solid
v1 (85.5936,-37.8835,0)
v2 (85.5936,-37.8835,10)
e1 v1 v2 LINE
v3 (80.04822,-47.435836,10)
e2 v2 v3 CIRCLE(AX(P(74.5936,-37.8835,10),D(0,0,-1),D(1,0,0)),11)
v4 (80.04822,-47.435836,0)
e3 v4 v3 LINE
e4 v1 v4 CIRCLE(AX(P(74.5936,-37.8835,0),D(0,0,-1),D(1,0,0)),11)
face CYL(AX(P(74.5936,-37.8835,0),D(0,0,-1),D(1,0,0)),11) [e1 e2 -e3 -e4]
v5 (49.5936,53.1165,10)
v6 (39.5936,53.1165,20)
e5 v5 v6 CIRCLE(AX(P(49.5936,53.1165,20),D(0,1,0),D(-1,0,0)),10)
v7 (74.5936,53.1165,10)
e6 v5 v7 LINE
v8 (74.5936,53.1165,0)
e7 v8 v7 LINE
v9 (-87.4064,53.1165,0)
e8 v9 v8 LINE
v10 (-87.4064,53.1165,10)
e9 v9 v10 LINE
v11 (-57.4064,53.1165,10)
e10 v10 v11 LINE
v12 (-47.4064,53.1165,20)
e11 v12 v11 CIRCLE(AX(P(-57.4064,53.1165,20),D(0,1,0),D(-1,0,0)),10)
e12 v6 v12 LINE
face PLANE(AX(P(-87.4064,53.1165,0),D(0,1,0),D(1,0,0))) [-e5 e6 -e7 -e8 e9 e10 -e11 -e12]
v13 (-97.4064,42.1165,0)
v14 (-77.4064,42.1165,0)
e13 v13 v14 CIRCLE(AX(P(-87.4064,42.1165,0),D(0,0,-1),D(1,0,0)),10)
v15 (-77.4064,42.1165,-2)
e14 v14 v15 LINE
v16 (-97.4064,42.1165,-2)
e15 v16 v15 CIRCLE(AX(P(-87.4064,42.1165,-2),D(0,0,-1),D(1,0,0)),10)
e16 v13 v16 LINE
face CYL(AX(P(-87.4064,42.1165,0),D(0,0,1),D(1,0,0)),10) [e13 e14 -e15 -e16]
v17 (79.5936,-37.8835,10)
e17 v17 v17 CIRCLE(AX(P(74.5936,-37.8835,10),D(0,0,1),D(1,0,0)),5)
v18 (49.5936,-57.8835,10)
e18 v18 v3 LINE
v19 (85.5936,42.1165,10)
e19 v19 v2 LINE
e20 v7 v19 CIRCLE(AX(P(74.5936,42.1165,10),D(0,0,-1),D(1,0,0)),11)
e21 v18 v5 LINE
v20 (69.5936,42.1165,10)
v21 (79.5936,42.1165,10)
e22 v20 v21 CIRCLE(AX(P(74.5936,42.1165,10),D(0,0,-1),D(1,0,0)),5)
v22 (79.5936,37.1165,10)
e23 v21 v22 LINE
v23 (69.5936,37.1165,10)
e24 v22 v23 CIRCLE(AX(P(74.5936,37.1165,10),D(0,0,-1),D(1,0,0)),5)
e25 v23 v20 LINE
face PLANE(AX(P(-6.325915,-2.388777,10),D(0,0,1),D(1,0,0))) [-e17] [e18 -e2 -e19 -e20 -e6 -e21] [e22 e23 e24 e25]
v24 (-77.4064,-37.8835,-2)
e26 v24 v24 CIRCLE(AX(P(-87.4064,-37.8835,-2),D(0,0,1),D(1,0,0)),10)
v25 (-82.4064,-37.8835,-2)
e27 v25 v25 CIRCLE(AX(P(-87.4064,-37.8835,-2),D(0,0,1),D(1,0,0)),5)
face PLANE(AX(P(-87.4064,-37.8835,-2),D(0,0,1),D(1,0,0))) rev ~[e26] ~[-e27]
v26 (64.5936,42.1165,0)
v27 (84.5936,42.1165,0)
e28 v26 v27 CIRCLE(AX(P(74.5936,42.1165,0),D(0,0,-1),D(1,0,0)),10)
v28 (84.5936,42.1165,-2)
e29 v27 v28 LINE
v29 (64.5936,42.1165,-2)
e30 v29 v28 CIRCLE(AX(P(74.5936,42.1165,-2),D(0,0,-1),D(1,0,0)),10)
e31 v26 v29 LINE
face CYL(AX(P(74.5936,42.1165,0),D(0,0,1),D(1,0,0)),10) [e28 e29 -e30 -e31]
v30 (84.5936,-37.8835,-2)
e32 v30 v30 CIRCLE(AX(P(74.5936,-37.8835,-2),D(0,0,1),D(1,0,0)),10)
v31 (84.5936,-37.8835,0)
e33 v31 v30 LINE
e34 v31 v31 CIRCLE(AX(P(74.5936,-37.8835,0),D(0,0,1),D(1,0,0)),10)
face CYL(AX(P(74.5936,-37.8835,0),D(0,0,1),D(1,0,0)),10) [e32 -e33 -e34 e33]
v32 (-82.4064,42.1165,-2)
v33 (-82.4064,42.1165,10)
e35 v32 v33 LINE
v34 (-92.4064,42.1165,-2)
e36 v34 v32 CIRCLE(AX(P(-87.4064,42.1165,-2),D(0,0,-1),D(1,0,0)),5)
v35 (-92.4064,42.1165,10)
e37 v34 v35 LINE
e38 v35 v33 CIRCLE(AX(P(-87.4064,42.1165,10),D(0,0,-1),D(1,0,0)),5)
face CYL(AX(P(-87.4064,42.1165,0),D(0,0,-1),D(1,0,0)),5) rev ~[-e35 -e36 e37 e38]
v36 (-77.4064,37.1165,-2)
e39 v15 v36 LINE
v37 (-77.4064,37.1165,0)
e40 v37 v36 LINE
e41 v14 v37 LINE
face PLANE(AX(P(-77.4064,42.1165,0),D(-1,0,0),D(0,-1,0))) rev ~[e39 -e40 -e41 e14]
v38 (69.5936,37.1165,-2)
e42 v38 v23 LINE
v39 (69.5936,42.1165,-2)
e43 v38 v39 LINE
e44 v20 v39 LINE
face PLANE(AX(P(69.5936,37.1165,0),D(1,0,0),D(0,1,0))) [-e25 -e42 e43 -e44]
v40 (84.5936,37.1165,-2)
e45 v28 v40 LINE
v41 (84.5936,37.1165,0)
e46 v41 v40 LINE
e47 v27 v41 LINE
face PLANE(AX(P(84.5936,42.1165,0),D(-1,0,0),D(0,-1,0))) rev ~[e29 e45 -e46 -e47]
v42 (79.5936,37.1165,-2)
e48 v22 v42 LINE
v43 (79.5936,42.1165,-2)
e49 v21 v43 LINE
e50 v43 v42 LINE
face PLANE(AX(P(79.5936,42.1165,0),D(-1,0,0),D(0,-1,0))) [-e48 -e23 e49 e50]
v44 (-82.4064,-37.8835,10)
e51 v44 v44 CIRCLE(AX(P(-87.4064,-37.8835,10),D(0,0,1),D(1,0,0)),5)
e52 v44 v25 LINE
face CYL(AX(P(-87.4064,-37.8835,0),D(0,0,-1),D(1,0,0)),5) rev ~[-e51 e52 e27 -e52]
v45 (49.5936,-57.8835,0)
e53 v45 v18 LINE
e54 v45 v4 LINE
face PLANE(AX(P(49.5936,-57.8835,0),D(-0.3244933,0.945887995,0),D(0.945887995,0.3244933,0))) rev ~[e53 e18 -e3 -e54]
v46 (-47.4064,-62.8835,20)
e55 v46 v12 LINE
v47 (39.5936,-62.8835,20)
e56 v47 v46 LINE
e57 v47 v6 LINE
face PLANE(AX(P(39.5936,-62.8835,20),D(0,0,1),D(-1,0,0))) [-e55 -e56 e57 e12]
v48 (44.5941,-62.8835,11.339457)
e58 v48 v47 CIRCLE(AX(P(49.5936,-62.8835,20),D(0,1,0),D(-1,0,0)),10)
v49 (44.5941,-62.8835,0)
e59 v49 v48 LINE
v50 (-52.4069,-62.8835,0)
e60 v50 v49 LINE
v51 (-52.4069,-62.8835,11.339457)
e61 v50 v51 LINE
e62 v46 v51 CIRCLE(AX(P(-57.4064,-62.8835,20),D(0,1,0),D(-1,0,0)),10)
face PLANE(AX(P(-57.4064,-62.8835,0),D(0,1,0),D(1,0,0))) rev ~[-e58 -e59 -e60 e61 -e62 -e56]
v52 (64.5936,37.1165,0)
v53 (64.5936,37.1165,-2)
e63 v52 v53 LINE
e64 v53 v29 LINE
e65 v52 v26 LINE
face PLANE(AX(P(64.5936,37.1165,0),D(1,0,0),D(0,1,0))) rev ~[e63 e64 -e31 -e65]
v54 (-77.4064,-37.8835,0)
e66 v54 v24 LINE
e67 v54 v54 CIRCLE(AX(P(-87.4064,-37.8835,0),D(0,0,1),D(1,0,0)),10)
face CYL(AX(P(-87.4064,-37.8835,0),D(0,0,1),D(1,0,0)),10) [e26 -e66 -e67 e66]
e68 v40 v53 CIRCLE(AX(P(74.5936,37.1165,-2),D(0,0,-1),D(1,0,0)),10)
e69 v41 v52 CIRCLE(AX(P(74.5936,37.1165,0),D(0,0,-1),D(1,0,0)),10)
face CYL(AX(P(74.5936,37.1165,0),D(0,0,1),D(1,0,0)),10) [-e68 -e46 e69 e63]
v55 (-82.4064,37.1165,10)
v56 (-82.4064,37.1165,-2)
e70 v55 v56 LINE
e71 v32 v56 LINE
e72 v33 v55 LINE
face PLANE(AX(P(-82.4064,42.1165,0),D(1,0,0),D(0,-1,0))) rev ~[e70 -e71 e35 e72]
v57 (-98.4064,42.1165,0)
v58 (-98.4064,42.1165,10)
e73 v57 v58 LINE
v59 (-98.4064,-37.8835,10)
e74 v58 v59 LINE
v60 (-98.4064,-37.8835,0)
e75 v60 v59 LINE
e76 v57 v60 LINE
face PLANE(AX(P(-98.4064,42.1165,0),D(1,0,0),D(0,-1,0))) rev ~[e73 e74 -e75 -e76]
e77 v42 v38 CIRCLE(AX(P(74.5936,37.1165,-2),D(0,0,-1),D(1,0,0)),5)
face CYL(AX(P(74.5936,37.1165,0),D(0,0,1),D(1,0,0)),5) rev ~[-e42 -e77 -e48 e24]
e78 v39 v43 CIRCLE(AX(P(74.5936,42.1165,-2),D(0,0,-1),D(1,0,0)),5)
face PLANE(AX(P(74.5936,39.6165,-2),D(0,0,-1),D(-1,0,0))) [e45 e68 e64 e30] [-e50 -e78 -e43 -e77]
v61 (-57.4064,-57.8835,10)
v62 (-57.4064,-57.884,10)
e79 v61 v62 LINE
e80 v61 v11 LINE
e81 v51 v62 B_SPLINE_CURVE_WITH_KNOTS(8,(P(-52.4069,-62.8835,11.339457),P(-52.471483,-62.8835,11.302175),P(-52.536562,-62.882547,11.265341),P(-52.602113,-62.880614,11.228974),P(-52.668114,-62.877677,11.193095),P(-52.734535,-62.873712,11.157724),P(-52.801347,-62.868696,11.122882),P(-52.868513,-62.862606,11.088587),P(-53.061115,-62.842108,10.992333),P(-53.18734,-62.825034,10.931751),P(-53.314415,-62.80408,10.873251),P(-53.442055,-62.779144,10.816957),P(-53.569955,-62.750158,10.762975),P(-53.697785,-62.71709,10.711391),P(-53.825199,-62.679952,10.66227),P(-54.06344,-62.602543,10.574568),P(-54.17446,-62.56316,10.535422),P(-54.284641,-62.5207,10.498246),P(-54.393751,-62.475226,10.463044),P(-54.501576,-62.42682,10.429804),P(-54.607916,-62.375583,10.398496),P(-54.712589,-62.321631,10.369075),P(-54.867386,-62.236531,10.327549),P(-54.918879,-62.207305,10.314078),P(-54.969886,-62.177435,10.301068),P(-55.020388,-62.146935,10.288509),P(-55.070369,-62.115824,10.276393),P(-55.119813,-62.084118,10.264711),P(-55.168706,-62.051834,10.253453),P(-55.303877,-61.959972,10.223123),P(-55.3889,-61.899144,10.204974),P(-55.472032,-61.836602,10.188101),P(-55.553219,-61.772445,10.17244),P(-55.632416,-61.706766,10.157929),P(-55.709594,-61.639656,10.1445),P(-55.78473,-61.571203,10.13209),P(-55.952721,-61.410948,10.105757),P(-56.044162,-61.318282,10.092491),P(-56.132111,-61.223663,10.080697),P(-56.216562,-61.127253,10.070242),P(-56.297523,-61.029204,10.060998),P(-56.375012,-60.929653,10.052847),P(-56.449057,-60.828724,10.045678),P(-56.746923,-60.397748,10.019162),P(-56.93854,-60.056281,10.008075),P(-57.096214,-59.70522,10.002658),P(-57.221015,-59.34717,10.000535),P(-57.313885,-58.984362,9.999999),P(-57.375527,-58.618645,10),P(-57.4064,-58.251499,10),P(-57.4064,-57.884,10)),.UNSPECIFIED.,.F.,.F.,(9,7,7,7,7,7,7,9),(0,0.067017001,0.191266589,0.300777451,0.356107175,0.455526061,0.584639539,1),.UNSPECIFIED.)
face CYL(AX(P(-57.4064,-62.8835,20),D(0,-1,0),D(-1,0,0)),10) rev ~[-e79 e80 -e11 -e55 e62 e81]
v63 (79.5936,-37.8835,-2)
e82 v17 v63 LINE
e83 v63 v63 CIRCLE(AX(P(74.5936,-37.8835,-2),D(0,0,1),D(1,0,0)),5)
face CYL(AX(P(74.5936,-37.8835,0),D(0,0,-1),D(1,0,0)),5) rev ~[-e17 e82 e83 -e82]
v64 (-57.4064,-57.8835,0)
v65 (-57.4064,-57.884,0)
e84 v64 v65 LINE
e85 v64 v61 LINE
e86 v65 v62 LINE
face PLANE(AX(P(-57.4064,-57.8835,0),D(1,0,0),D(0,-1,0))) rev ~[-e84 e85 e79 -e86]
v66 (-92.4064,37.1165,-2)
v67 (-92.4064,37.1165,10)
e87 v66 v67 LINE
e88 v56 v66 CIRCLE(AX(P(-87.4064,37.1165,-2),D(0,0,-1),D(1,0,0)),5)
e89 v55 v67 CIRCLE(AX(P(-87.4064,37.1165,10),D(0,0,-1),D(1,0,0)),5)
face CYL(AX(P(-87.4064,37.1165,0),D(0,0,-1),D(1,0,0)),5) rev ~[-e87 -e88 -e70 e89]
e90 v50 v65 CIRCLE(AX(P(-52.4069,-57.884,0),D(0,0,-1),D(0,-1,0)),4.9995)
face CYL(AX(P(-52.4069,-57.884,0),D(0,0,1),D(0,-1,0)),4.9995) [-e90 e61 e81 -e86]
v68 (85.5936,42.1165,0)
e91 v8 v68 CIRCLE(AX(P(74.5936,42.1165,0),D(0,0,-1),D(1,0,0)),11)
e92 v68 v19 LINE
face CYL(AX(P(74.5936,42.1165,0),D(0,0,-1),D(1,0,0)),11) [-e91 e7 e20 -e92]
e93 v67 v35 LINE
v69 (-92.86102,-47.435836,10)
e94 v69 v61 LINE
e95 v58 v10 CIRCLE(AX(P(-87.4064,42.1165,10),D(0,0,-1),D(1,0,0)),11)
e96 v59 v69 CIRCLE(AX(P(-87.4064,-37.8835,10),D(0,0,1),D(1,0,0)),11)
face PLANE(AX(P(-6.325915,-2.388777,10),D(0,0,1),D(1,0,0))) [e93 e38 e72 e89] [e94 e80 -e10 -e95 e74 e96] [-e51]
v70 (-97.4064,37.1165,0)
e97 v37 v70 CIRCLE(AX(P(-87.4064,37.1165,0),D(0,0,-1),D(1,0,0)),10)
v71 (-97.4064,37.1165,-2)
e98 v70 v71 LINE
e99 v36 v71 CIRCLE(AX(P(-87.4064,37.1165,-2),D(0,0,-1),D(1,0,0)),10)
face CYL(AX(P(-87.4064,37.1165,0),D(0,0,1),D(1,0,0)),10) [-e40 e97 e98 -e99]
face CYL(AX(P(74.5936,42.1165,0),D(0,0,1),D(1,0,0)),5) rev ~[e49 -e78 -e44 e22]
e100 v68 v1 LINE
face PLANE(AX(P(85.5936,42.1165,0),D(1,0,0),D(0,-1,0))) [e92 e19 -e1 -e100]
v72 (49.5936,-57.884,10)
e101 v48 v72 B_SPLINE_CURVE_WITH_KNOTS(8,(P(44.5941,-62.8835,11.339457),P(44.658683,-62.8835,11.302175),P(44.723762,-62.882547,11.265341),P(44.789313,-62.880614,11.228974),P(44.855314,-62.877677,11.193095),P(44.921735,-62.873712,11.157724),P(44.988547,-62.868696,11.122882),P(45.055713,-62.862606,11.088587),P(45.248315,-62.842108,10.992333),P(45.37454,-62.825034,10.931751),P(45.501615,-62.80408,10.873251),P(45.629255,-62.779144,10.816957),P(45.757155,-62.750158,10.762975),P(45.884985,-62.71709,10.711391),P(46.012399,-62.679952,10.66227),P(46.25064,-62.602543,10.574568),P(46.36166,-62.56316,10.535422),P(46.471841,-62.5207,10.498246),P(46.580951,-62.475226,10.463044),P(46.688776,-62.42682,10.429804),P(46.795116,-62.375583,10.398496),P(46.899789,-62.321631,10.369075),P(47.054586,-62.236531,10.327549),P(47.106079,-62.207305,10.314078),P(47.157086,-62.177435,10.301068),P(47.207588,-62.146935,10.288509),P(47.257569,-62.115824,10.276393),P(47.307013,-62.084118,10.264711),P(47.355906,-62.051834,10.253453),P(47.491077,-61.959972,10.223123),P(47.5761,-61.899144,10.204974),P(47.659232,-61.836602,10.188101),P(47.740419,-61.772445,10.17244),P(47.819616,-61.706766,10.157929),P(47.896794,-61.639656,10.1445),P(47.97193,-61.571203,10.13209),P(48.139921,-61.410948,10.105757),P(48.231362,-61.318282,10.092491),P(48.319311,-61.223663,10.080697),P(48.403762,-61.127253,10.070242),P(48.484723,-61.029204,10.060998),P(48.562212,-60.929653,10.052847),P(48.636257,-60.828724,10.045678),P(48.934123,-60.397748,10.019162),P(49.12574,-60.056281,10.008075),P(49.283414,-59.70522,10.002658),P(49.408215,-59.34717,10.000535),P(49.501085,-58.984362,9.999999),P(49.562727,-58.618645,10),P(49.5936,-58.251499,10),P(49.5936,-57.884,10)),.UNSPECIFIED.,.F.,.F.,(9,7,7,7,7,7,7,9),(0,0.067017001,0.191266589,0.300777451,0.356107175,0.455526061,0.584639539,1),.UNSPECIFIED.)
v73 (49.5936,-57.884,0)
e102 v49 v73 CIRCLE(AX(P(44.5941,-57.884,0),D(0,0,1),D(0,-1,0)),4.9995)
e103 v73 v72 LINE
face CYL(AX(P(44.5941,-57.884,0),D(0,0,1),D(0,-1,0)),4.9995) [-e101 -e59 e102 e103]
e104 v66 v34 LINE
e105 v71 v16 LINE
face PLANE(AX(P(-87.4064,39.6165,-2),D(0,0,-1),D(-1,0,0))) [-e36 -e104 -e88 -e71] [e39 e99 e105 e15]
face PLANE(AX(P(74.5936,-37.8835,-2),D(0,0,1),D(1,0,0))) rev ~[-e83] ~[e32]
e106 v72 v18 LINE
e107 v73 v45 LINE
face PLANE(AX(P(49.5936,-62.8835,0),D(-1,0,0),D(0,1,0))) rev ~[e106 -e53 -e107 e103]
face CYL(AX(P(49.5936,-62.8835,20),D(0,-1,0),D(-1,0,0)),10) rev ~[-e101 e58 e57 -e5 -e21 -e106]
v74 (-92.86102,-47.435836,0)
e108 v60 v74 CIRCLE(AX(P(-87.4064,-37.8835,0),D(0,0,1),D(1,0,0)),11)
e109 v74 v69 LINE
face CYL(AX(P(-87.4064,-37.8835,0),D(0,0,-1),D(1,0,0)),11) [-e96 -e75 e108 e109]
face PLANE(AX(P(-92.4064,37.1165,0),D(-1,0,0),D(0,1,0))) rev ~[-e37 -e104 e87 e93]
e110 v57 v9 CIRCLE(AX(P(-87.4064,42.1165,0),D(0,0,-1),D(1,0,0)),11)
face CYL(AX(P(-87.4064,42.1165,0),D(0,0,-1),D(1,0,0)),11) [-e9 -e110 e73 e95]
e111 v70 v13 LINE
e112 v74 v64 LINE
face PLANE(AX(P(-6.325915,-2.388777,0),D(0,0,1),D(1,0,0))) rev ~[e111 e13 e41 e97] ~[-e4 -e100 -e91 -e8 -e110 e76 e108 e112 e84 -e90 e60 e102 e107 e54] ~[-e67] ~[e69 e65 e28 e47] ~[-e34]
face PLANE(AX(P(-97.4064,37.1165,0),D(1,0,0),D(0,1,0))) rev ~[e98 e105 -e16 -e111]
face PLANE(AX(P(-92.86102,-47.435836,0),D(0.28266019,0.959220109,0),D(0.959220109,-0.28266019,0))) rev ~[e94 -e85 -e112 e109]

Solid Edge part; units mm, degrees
sketch "Sketch1" plane through (0, 0, 0) normal (0, 0, 1) x (1, 0, 0)
  circle A0 centre (-87.4064, -37.8835) radius 5
  circle A1 centre (-87.4064, -37.8835) radius 10
  arc A2 (69.5936, 42.1165) -> (79.5936, 42.1165) centre (74.5936, 42.1165) cw
  line L0 (79.5936, 42.1165) -> (79.5936, 37.1165)
  arc A3 (79.5936, 37.1165) -> (69.5936, 37.1165) centre (74.5936, 37.1165) cw
  line L1 (69.5936, 37.1165) -> (69.5936, 42.1165)
  line L2 (84.5936, 42.1165) -> (84.5936, 37.1165)
  arc A4 (64.5936, 42.1165) -> (84.5936, 42.1165) centre (74.5936, 42.1165) cw
  line L3 (64.5936, 37.1165) -> (64.5936, 42.1165)
  arc A5 (84.5936, 37.1165) -> (64.5936, 37.1165) centre (74.5936, 37.1165) cw
  circle A6 centre (74.5936, -37.8835) radius 5
  circle A7 centre (74.5936, -37.8835) radius 10
  line L4 (-77.4064, 42.1165) -> (-77.4064, 37.1165)
  arc A8 (-77.4064, 37.1165) -> (-97.4064, 37.1165) centre (-87.4064, 37.1165) cw
  line L5 (-97.4064, 37.1165) -> (-97.4064, 42.1165)
  arc A9 (-97.4064, 42.1165) -> (-77.4064, 42.1165) centre (-87.4064, 42.1165) cw
  line L6 (-92.4064, 37.1165) -> (-92.4064, 42.1165)
  arc A10 (-82.4064, 37.1165) -> (-92.4064, 37.1165) centre (-87.4064, 37.1165) cw
  line L7 (-82.4064, 42.1165) -> (-82.4064, 37.1165)
  arc A11 (-92.4064, 42.1165) -> (-82.4064, 42.1165) centre (-87.4064, 42.1165) cw
extrude "Protrusion1" add sketch "Sketch1" against normal blind 2
sketch "Sketch2" plane through (-87.4064, -37.8835, 0) normal (0, 0, 1) x (1, 0, 0)
  arc A0 (5, 75) -> (-5, 75) centre (0, 75) cw
  line L0 (-5, 75) -> (-5, 80)
  arc A1 (-5, 80) -> (5, 80) centre (0, 80) cw
  line L1 (5, 80) -> (5, 75)
  circle A2 centre (0, 0) radius 5
  circle A3 centre (162, 0) radius 5
  arc A4 (167, 75) -> (157, 75) centre (162, 75) cw
  line L2 (157, 75) -> (157, 80)
  arc A5 (157, 80) -> (167, 80) centre (162, 80) cw
  line L3 (167, 80) -> (167, 75)
  line L4 (30, -25) -> (137, -25)
  line L5 (137, -25) -> (137, -20)
  line L6 (137, -20) -> (167.4546, -9.5523)
  arc A6 (173, 0) -> (167.4546, -9.5523) centre (162, 0) cw
  line L7 (173, 80) -> (173, 0)
  arc A7 (162, 91) -> (173, 80) centre (162, 80) cw
  line L8 (0, 91) -> (162, 91)
  arc A8 (-11, 80) -> (0, 91) centre (0, 80) cw
  line L9 (-11, 80) -> (-11, 0)
  arc A9 (-11, 0) -> (-5.4546, -9.5523) centre (0, 0) ccw
  line L10 (-5.4546, -9.5523) -> (30, -20)
  line L11 (30, -20) -> (30, -25)
  dimension "D1" = 1
  dimension "D2" = 25
  dimension "D3" = 30
  dimension "D4" = 25
  dimension "D5" = 5
extrude "ExtrudedProtrusion_2" add sketch "Sketch2" along normal blind 10
sketch "Sketch3" plane through (-6.4064, 53.1165, 5) normal (0, 1, 0) x (-1, 0, 0)
  arc A0 (41, 15) -> (51, 5) centre (51, 15) ccw
  line L0 (-46, 15) -> (41, 15)
  arc A1 (-56, 5) -> (-46, 15) centre (-56, 15) ccw
  line L1 (-56, 5) -> (51, 5)
  dimension "D1" = 10
extrude "Protrusion2" add sketch "Sketch3" along normal up to surface (116 mm away) from surface at -116
fillet "Round_1" radius 5 2 edges at (-57.4064, -62.8835, 5) (49.5936, -62.8835, 5)
